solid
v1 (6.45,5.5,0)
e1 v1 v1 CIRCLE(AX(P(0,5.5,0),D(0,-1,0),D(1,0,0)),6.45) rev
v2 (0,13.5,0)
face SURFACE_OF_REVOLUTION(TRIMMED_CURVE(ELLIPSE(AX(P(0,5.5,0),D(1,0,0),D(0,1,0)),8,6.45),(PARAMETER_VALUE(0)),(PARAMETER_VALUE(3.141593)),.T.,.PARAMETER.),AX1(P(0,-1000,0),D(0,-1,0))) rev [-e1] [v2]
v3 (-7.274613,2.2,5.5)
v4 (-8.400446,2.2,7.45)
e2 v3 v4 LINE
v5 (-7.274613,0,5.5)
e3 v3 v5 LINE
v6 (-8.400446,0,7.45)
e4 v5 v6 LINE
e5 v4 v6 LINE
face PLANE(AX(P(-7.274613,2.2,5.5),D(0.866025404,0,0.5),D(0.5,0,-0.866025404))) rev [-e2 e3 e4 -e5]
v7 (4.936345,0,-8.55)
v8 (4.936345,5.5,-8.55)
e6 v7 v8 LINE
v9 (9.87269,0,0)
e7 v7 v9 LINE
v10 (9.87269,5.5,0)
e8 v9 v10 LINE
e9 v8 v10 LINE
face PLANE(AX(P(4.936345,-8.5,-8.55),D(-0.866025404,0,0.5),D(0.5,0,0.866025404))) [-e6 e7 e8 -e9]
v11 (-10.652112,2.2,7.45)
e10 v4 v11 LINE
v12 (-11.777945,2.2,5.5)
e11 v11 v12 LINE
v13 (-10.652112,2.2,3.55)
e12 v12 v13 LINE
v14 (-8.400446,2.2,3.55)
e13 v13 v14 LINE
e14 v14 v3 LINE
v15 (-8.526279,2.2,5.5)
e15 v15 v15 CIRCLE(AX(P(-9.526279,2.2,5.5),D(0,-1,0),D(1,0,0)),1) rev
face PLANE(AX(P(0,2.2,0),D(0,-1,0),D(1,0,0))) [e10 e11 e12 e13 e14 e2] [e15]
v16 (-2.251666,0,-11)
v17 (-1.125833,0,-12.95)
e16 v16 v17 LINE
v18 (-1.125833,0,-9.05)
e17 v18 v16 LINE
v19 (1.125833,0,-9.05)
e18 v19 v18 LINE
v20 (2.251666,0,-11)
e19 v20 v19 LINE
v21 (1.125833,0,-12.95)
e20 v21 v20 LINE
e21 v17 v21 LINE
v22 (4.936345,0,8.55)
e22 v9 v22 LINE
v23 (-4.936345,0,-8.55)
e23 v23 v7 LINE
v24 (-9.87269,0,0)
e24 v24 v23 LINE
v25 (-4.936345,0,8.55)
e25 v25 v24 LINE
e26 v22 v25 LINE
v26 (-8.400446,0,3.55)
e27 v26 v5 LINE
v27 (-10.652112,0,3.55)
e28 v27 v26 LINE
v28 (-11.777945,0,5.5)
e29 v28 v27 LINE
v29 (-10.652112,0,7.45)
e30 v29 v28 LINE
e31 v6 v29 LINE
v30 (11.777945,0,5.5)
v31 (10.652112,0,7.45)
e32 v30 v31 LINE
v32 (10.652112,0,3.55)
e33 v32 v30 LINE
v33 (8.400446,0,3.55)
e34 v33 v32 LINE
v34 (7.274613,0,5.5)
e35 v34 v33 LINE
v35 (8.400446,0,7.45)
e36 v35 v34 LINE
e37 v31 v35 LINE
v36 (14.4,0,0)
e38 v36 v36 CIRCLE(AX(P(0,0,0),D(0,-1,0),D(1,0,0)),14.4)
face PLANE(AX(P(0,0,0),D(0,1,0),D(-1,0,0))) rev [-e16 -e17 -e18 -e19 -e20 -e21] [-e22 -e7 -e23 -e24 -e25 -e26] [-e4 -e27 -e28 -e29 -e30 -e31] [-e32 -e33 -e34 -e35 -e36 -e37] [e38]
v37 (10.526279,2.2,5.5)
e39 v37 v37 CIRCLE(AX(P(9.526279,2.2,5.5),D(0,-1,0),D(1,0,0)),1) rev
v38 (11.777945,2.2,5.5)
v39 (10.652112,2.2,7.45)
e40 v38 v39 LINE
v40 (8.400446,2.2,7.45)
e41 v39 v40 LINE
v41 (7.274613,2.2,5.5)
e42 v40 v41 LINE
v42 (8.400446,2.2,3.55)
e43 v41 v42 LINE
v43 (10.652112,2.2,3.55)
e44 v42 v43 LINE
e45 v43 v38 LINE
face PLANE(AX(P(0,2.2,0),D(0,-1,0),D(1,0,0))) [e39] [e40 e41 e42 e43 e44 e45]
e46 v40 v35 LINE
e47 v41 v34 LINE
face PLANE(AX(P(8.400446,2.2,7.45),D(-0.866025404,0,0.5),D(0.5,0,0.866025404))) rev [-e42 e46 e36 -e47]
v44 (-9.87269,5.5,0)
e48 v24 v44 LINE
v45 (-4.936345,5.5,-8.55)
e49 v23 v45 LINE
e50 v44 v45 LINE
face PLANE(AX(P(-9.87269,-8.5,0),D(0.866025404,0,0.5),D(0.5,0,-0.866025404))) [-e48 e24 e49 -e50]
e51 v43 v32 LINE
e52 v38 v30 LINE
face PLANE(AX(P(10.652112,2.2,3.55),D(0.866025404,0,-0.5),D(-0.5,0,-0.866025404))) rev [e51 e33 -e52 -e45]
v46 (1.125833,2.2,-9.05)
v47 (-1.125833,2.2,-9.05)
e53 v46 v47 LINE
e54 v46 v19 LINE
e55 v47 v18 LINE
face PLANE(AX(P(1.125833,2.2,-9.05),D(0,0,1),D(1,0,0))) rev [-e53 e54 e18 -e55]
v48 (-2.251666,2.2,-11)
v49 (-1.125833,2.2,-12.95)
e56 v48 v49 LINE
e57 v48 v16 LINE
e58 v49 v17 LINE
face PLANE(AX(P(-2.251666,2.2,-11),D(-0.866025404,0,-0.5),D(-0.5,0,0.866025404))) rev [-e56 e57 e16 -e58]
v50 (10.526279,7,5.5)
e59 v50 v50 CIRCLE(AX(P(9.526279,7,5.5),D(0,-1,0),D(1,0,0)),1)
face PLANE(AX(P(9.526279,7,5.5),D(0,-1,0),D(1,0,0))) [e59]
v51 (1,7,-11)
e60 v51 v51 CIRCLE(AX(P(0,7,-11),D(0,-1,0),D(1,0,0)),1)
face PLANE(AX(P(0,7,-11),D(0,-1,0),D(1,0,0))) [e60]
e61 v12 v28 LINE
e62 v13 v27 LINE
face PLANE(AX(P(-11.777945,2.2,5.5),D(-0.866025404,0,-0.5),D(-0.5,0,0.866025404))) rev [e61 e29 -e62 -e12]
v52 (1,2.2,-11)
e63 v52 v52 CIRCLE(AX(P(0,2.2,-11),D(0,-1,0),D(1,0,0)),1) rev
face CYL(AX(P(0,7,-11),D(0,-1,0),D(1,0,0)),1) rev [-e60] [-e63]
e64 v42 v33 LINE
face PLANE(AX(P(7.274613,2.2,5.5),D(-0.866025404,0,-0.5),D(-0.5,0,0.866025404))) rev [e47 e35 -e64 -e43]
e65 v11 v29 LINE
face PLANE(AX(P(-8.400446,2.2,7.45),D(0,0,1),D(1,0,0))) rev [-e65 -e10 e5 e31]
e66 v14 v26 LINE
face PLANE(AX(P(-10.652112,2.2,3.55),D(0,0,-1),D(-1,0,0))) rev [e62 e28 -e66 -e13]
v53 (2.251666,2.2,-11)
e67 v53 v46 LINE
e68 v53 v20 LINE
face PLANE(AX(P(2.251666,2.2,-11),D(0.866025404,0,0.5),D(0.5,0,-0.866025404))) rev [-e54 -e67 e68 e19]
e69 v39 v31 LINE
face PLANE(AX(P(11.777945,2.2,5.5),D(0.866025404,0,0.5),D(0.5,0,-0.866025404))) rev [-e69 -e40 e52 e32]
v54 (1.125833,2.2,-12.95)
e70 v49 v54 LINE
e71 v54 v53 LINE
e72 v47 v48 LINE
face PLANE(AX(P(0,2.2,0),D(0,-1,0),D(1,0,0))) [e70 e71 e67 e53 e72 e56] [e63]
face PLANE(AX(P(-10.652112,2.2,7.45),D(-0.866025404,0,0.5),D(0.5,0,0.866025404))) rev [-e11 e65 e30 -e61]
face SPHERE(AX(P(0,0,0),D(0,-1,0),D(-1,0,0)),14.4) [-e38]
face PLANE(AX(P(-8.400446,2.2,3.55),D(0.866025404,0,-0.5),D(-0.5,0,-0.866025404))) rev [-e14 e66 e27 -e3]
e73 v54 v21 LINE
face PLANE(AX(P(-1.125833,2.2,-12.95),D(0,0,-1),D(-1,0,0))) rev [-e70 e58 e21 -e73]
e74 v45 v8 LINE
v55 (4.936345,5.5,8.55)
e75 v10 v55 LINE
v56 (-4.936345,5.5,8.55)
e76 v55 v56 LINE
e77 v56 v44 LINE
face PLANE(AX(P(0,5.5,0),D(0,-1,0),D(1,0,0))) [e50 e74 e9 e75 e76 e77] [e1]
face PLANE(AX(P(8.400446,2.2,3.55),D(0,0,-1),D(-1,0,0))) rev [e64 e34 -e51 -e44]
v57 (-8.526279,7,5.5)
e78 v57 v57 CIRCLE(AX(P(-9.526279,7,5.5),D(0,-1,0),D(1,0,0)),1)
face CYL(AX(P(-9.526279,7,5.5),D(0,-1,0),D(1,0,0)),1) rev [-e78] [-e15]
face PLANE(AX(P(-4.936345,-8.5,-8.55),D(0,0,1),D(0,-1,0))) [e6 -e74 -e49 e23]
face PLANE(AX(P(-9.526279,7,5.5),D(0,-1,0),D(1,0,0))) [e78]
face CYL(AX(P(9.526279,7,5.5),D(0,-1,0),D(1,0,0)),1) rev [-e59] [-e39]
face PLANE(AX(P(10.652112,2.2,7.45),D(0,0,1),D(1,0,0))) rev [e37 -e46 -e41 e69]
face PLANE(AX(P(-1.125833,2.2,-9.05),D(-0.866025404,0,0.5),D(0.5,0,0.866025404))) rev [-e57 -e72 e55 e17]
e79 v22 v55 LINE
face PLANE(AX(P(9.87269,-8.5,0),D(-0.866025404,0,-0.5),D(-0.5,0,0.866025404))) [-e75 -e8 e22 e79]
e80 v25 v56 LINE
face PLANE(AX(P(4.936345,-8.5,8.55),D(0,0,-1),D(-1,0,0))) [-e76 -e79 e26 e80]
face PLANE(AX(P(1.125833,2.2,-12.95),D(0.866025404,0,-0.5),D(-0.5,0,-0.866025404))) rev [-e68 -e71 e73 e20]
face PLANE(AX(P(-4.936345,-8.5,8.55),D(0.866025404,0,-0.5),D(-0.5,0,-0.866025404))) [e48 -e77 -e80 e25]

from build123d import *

# Parameters (mm, degrees)
CUT_EXTRUDE2_DEPTH      = 3.5
CUT_EXTRUDE4_DEPTH      = 2
SKETCH7_R               = 1
CUT_EXTRUDE6_DEPTH      = 7
CUT_EXTRUDE7_DEPTH      = 2.2
CUT_EXTRUDE8_DEPTH      = 12
CUT_EXTRUDE8_DEPTH_BACK = 2


with BuildPart() as part:
    # Sketch1 → Revolve1 (revolve)
    with BuildSketch(Plane.XY):
        with BuildLine():
            ThreePointArc((0, 14.4), (-10.182337649, 10.182337649), (-14.4, 0))
            Line((-14.4, 0), (0, 0))
            Line((0, 0), (0, 14.4))
        make_face()
    revolve(axis=Axis((0, -1000, 0), (0, 1, 0)))

    # Sketch2 → Cut-Extrude2 (cut)
    with BuildSketch(Plane.XZ):
        Polygon((4.878609775, -8.45), (9.757219549, 0), (4.878609775, 8.45), (-4.878609775, 8.45), (-9.757219549, 0), (-4.878609775, -8.45), align=None)
    extrude(amount=-CUT_EXTRUDE2_DEPTH, mode=Mode.SUBTRACT)

    # Sketch3 → Cut-Extrude4 (cut)
    with BuildSketch(Plane.XZ.offset(-3.5)):
        Polygon((3.723909236, -6.45), (7.447818473, 0), (3.723909236, 6.45), (-3.723909236, 6.45), (-7.447818473, 0), (-3.723909236, -6.45), align=None)
    extrude(amount=-CUT_EXTRUDE4_DEPTH, mode=Mode.SUBTRACT)

    # Sketch4 → Cut-Revolve1 (revolve, cut)
    with BuildSketch(Plane(origin=(0, 0, 0), x_dir=(0, 0, -1), z_dir=(1, 0, 0))):
        with BuildLine():
            Line((-6.45, 5.5), (0, 5.5))
            Line((0, 5.5), (0, 13.5))
            add(Edge.make_bspline(
                [(0, 13.5), (-6.45, 13.5), (-6.45, 5.5)],
                knots=[0, 0, 0, 1.570796327, 1.570796327, 1.570796327], degree=2, weights=[1, 0.707106781, 1]))
        make_face()
    revolve(axis=Axis((0, -1000, 0), (0, 1, 0)), mode=Mode.SUBTRACT)

    # Sketch7 → Cut-Extrude6 (cut)
    with BuildSketch(Plane.XZ):
        with Locations((-9.526279442, 5.5)):
            Circle(SKETCH7_R)
        with Locations((9.526279442, 5.5)):
            Circle(SKETCH7_R)
        with Locations((0, -11)):
            Circle(SKETCH7_R)
    extrude(amount=-CUT_EXTRUDE6_DEPTH, mode=Mode.SUBTRACT)

    # Sketch8 → Cut-Extrude7 (cut)
    with BuildSketch(Plane.XZ):
        Polygon((-8.400446417, 3.55), (-7.274613392, 5.5), (-8.400446417, 7.45), (-10.652112467, 7.45), (-11.777945491, 5.5), (-10.652112467, 3.55), align=None)
        Polygon((7.274613392, 5.5), (8.400446417, 3.55), (10.652112467, 3.55), (11.777945491, 5.5), (10.652112467, 7.45), (8.400446417, 7.45), align=None)
        Polygon((1.125833025, -9.05), (-1.125833025, -9.05), (-2.25166605, -11), (-1.125833025, -12.95), (1.125833025, -12.95), (2.25166605, -11), align=None)
    extrude(amount=-CUT_EXTRUDE7_DEPTH, mode=Mode.SUBTRACT)

    # Sketch9 → Cut-Extrude8 (cut, two sides: drawn at the far end of the back side and taken through both)
    with BuildSketch(Plane.XZ.offset(-3.5).offset(-CUT_EXTRUDE8_DEPTH_BACK)):
        Polygon((4.936344802, -8.55), (9.872689603, 0), (4.936344802, 8.55), (-4.936344802, 8.55), (-9.872689603, 0), (-4.936344802, -8.55), align=None)
    extrude(amount=CUT_EXTRUDE8_DEPTH + CUT_EXTRUDE8_DEPTH_BACK, mode=Mode.SUBTRACT)


solid = part.part
